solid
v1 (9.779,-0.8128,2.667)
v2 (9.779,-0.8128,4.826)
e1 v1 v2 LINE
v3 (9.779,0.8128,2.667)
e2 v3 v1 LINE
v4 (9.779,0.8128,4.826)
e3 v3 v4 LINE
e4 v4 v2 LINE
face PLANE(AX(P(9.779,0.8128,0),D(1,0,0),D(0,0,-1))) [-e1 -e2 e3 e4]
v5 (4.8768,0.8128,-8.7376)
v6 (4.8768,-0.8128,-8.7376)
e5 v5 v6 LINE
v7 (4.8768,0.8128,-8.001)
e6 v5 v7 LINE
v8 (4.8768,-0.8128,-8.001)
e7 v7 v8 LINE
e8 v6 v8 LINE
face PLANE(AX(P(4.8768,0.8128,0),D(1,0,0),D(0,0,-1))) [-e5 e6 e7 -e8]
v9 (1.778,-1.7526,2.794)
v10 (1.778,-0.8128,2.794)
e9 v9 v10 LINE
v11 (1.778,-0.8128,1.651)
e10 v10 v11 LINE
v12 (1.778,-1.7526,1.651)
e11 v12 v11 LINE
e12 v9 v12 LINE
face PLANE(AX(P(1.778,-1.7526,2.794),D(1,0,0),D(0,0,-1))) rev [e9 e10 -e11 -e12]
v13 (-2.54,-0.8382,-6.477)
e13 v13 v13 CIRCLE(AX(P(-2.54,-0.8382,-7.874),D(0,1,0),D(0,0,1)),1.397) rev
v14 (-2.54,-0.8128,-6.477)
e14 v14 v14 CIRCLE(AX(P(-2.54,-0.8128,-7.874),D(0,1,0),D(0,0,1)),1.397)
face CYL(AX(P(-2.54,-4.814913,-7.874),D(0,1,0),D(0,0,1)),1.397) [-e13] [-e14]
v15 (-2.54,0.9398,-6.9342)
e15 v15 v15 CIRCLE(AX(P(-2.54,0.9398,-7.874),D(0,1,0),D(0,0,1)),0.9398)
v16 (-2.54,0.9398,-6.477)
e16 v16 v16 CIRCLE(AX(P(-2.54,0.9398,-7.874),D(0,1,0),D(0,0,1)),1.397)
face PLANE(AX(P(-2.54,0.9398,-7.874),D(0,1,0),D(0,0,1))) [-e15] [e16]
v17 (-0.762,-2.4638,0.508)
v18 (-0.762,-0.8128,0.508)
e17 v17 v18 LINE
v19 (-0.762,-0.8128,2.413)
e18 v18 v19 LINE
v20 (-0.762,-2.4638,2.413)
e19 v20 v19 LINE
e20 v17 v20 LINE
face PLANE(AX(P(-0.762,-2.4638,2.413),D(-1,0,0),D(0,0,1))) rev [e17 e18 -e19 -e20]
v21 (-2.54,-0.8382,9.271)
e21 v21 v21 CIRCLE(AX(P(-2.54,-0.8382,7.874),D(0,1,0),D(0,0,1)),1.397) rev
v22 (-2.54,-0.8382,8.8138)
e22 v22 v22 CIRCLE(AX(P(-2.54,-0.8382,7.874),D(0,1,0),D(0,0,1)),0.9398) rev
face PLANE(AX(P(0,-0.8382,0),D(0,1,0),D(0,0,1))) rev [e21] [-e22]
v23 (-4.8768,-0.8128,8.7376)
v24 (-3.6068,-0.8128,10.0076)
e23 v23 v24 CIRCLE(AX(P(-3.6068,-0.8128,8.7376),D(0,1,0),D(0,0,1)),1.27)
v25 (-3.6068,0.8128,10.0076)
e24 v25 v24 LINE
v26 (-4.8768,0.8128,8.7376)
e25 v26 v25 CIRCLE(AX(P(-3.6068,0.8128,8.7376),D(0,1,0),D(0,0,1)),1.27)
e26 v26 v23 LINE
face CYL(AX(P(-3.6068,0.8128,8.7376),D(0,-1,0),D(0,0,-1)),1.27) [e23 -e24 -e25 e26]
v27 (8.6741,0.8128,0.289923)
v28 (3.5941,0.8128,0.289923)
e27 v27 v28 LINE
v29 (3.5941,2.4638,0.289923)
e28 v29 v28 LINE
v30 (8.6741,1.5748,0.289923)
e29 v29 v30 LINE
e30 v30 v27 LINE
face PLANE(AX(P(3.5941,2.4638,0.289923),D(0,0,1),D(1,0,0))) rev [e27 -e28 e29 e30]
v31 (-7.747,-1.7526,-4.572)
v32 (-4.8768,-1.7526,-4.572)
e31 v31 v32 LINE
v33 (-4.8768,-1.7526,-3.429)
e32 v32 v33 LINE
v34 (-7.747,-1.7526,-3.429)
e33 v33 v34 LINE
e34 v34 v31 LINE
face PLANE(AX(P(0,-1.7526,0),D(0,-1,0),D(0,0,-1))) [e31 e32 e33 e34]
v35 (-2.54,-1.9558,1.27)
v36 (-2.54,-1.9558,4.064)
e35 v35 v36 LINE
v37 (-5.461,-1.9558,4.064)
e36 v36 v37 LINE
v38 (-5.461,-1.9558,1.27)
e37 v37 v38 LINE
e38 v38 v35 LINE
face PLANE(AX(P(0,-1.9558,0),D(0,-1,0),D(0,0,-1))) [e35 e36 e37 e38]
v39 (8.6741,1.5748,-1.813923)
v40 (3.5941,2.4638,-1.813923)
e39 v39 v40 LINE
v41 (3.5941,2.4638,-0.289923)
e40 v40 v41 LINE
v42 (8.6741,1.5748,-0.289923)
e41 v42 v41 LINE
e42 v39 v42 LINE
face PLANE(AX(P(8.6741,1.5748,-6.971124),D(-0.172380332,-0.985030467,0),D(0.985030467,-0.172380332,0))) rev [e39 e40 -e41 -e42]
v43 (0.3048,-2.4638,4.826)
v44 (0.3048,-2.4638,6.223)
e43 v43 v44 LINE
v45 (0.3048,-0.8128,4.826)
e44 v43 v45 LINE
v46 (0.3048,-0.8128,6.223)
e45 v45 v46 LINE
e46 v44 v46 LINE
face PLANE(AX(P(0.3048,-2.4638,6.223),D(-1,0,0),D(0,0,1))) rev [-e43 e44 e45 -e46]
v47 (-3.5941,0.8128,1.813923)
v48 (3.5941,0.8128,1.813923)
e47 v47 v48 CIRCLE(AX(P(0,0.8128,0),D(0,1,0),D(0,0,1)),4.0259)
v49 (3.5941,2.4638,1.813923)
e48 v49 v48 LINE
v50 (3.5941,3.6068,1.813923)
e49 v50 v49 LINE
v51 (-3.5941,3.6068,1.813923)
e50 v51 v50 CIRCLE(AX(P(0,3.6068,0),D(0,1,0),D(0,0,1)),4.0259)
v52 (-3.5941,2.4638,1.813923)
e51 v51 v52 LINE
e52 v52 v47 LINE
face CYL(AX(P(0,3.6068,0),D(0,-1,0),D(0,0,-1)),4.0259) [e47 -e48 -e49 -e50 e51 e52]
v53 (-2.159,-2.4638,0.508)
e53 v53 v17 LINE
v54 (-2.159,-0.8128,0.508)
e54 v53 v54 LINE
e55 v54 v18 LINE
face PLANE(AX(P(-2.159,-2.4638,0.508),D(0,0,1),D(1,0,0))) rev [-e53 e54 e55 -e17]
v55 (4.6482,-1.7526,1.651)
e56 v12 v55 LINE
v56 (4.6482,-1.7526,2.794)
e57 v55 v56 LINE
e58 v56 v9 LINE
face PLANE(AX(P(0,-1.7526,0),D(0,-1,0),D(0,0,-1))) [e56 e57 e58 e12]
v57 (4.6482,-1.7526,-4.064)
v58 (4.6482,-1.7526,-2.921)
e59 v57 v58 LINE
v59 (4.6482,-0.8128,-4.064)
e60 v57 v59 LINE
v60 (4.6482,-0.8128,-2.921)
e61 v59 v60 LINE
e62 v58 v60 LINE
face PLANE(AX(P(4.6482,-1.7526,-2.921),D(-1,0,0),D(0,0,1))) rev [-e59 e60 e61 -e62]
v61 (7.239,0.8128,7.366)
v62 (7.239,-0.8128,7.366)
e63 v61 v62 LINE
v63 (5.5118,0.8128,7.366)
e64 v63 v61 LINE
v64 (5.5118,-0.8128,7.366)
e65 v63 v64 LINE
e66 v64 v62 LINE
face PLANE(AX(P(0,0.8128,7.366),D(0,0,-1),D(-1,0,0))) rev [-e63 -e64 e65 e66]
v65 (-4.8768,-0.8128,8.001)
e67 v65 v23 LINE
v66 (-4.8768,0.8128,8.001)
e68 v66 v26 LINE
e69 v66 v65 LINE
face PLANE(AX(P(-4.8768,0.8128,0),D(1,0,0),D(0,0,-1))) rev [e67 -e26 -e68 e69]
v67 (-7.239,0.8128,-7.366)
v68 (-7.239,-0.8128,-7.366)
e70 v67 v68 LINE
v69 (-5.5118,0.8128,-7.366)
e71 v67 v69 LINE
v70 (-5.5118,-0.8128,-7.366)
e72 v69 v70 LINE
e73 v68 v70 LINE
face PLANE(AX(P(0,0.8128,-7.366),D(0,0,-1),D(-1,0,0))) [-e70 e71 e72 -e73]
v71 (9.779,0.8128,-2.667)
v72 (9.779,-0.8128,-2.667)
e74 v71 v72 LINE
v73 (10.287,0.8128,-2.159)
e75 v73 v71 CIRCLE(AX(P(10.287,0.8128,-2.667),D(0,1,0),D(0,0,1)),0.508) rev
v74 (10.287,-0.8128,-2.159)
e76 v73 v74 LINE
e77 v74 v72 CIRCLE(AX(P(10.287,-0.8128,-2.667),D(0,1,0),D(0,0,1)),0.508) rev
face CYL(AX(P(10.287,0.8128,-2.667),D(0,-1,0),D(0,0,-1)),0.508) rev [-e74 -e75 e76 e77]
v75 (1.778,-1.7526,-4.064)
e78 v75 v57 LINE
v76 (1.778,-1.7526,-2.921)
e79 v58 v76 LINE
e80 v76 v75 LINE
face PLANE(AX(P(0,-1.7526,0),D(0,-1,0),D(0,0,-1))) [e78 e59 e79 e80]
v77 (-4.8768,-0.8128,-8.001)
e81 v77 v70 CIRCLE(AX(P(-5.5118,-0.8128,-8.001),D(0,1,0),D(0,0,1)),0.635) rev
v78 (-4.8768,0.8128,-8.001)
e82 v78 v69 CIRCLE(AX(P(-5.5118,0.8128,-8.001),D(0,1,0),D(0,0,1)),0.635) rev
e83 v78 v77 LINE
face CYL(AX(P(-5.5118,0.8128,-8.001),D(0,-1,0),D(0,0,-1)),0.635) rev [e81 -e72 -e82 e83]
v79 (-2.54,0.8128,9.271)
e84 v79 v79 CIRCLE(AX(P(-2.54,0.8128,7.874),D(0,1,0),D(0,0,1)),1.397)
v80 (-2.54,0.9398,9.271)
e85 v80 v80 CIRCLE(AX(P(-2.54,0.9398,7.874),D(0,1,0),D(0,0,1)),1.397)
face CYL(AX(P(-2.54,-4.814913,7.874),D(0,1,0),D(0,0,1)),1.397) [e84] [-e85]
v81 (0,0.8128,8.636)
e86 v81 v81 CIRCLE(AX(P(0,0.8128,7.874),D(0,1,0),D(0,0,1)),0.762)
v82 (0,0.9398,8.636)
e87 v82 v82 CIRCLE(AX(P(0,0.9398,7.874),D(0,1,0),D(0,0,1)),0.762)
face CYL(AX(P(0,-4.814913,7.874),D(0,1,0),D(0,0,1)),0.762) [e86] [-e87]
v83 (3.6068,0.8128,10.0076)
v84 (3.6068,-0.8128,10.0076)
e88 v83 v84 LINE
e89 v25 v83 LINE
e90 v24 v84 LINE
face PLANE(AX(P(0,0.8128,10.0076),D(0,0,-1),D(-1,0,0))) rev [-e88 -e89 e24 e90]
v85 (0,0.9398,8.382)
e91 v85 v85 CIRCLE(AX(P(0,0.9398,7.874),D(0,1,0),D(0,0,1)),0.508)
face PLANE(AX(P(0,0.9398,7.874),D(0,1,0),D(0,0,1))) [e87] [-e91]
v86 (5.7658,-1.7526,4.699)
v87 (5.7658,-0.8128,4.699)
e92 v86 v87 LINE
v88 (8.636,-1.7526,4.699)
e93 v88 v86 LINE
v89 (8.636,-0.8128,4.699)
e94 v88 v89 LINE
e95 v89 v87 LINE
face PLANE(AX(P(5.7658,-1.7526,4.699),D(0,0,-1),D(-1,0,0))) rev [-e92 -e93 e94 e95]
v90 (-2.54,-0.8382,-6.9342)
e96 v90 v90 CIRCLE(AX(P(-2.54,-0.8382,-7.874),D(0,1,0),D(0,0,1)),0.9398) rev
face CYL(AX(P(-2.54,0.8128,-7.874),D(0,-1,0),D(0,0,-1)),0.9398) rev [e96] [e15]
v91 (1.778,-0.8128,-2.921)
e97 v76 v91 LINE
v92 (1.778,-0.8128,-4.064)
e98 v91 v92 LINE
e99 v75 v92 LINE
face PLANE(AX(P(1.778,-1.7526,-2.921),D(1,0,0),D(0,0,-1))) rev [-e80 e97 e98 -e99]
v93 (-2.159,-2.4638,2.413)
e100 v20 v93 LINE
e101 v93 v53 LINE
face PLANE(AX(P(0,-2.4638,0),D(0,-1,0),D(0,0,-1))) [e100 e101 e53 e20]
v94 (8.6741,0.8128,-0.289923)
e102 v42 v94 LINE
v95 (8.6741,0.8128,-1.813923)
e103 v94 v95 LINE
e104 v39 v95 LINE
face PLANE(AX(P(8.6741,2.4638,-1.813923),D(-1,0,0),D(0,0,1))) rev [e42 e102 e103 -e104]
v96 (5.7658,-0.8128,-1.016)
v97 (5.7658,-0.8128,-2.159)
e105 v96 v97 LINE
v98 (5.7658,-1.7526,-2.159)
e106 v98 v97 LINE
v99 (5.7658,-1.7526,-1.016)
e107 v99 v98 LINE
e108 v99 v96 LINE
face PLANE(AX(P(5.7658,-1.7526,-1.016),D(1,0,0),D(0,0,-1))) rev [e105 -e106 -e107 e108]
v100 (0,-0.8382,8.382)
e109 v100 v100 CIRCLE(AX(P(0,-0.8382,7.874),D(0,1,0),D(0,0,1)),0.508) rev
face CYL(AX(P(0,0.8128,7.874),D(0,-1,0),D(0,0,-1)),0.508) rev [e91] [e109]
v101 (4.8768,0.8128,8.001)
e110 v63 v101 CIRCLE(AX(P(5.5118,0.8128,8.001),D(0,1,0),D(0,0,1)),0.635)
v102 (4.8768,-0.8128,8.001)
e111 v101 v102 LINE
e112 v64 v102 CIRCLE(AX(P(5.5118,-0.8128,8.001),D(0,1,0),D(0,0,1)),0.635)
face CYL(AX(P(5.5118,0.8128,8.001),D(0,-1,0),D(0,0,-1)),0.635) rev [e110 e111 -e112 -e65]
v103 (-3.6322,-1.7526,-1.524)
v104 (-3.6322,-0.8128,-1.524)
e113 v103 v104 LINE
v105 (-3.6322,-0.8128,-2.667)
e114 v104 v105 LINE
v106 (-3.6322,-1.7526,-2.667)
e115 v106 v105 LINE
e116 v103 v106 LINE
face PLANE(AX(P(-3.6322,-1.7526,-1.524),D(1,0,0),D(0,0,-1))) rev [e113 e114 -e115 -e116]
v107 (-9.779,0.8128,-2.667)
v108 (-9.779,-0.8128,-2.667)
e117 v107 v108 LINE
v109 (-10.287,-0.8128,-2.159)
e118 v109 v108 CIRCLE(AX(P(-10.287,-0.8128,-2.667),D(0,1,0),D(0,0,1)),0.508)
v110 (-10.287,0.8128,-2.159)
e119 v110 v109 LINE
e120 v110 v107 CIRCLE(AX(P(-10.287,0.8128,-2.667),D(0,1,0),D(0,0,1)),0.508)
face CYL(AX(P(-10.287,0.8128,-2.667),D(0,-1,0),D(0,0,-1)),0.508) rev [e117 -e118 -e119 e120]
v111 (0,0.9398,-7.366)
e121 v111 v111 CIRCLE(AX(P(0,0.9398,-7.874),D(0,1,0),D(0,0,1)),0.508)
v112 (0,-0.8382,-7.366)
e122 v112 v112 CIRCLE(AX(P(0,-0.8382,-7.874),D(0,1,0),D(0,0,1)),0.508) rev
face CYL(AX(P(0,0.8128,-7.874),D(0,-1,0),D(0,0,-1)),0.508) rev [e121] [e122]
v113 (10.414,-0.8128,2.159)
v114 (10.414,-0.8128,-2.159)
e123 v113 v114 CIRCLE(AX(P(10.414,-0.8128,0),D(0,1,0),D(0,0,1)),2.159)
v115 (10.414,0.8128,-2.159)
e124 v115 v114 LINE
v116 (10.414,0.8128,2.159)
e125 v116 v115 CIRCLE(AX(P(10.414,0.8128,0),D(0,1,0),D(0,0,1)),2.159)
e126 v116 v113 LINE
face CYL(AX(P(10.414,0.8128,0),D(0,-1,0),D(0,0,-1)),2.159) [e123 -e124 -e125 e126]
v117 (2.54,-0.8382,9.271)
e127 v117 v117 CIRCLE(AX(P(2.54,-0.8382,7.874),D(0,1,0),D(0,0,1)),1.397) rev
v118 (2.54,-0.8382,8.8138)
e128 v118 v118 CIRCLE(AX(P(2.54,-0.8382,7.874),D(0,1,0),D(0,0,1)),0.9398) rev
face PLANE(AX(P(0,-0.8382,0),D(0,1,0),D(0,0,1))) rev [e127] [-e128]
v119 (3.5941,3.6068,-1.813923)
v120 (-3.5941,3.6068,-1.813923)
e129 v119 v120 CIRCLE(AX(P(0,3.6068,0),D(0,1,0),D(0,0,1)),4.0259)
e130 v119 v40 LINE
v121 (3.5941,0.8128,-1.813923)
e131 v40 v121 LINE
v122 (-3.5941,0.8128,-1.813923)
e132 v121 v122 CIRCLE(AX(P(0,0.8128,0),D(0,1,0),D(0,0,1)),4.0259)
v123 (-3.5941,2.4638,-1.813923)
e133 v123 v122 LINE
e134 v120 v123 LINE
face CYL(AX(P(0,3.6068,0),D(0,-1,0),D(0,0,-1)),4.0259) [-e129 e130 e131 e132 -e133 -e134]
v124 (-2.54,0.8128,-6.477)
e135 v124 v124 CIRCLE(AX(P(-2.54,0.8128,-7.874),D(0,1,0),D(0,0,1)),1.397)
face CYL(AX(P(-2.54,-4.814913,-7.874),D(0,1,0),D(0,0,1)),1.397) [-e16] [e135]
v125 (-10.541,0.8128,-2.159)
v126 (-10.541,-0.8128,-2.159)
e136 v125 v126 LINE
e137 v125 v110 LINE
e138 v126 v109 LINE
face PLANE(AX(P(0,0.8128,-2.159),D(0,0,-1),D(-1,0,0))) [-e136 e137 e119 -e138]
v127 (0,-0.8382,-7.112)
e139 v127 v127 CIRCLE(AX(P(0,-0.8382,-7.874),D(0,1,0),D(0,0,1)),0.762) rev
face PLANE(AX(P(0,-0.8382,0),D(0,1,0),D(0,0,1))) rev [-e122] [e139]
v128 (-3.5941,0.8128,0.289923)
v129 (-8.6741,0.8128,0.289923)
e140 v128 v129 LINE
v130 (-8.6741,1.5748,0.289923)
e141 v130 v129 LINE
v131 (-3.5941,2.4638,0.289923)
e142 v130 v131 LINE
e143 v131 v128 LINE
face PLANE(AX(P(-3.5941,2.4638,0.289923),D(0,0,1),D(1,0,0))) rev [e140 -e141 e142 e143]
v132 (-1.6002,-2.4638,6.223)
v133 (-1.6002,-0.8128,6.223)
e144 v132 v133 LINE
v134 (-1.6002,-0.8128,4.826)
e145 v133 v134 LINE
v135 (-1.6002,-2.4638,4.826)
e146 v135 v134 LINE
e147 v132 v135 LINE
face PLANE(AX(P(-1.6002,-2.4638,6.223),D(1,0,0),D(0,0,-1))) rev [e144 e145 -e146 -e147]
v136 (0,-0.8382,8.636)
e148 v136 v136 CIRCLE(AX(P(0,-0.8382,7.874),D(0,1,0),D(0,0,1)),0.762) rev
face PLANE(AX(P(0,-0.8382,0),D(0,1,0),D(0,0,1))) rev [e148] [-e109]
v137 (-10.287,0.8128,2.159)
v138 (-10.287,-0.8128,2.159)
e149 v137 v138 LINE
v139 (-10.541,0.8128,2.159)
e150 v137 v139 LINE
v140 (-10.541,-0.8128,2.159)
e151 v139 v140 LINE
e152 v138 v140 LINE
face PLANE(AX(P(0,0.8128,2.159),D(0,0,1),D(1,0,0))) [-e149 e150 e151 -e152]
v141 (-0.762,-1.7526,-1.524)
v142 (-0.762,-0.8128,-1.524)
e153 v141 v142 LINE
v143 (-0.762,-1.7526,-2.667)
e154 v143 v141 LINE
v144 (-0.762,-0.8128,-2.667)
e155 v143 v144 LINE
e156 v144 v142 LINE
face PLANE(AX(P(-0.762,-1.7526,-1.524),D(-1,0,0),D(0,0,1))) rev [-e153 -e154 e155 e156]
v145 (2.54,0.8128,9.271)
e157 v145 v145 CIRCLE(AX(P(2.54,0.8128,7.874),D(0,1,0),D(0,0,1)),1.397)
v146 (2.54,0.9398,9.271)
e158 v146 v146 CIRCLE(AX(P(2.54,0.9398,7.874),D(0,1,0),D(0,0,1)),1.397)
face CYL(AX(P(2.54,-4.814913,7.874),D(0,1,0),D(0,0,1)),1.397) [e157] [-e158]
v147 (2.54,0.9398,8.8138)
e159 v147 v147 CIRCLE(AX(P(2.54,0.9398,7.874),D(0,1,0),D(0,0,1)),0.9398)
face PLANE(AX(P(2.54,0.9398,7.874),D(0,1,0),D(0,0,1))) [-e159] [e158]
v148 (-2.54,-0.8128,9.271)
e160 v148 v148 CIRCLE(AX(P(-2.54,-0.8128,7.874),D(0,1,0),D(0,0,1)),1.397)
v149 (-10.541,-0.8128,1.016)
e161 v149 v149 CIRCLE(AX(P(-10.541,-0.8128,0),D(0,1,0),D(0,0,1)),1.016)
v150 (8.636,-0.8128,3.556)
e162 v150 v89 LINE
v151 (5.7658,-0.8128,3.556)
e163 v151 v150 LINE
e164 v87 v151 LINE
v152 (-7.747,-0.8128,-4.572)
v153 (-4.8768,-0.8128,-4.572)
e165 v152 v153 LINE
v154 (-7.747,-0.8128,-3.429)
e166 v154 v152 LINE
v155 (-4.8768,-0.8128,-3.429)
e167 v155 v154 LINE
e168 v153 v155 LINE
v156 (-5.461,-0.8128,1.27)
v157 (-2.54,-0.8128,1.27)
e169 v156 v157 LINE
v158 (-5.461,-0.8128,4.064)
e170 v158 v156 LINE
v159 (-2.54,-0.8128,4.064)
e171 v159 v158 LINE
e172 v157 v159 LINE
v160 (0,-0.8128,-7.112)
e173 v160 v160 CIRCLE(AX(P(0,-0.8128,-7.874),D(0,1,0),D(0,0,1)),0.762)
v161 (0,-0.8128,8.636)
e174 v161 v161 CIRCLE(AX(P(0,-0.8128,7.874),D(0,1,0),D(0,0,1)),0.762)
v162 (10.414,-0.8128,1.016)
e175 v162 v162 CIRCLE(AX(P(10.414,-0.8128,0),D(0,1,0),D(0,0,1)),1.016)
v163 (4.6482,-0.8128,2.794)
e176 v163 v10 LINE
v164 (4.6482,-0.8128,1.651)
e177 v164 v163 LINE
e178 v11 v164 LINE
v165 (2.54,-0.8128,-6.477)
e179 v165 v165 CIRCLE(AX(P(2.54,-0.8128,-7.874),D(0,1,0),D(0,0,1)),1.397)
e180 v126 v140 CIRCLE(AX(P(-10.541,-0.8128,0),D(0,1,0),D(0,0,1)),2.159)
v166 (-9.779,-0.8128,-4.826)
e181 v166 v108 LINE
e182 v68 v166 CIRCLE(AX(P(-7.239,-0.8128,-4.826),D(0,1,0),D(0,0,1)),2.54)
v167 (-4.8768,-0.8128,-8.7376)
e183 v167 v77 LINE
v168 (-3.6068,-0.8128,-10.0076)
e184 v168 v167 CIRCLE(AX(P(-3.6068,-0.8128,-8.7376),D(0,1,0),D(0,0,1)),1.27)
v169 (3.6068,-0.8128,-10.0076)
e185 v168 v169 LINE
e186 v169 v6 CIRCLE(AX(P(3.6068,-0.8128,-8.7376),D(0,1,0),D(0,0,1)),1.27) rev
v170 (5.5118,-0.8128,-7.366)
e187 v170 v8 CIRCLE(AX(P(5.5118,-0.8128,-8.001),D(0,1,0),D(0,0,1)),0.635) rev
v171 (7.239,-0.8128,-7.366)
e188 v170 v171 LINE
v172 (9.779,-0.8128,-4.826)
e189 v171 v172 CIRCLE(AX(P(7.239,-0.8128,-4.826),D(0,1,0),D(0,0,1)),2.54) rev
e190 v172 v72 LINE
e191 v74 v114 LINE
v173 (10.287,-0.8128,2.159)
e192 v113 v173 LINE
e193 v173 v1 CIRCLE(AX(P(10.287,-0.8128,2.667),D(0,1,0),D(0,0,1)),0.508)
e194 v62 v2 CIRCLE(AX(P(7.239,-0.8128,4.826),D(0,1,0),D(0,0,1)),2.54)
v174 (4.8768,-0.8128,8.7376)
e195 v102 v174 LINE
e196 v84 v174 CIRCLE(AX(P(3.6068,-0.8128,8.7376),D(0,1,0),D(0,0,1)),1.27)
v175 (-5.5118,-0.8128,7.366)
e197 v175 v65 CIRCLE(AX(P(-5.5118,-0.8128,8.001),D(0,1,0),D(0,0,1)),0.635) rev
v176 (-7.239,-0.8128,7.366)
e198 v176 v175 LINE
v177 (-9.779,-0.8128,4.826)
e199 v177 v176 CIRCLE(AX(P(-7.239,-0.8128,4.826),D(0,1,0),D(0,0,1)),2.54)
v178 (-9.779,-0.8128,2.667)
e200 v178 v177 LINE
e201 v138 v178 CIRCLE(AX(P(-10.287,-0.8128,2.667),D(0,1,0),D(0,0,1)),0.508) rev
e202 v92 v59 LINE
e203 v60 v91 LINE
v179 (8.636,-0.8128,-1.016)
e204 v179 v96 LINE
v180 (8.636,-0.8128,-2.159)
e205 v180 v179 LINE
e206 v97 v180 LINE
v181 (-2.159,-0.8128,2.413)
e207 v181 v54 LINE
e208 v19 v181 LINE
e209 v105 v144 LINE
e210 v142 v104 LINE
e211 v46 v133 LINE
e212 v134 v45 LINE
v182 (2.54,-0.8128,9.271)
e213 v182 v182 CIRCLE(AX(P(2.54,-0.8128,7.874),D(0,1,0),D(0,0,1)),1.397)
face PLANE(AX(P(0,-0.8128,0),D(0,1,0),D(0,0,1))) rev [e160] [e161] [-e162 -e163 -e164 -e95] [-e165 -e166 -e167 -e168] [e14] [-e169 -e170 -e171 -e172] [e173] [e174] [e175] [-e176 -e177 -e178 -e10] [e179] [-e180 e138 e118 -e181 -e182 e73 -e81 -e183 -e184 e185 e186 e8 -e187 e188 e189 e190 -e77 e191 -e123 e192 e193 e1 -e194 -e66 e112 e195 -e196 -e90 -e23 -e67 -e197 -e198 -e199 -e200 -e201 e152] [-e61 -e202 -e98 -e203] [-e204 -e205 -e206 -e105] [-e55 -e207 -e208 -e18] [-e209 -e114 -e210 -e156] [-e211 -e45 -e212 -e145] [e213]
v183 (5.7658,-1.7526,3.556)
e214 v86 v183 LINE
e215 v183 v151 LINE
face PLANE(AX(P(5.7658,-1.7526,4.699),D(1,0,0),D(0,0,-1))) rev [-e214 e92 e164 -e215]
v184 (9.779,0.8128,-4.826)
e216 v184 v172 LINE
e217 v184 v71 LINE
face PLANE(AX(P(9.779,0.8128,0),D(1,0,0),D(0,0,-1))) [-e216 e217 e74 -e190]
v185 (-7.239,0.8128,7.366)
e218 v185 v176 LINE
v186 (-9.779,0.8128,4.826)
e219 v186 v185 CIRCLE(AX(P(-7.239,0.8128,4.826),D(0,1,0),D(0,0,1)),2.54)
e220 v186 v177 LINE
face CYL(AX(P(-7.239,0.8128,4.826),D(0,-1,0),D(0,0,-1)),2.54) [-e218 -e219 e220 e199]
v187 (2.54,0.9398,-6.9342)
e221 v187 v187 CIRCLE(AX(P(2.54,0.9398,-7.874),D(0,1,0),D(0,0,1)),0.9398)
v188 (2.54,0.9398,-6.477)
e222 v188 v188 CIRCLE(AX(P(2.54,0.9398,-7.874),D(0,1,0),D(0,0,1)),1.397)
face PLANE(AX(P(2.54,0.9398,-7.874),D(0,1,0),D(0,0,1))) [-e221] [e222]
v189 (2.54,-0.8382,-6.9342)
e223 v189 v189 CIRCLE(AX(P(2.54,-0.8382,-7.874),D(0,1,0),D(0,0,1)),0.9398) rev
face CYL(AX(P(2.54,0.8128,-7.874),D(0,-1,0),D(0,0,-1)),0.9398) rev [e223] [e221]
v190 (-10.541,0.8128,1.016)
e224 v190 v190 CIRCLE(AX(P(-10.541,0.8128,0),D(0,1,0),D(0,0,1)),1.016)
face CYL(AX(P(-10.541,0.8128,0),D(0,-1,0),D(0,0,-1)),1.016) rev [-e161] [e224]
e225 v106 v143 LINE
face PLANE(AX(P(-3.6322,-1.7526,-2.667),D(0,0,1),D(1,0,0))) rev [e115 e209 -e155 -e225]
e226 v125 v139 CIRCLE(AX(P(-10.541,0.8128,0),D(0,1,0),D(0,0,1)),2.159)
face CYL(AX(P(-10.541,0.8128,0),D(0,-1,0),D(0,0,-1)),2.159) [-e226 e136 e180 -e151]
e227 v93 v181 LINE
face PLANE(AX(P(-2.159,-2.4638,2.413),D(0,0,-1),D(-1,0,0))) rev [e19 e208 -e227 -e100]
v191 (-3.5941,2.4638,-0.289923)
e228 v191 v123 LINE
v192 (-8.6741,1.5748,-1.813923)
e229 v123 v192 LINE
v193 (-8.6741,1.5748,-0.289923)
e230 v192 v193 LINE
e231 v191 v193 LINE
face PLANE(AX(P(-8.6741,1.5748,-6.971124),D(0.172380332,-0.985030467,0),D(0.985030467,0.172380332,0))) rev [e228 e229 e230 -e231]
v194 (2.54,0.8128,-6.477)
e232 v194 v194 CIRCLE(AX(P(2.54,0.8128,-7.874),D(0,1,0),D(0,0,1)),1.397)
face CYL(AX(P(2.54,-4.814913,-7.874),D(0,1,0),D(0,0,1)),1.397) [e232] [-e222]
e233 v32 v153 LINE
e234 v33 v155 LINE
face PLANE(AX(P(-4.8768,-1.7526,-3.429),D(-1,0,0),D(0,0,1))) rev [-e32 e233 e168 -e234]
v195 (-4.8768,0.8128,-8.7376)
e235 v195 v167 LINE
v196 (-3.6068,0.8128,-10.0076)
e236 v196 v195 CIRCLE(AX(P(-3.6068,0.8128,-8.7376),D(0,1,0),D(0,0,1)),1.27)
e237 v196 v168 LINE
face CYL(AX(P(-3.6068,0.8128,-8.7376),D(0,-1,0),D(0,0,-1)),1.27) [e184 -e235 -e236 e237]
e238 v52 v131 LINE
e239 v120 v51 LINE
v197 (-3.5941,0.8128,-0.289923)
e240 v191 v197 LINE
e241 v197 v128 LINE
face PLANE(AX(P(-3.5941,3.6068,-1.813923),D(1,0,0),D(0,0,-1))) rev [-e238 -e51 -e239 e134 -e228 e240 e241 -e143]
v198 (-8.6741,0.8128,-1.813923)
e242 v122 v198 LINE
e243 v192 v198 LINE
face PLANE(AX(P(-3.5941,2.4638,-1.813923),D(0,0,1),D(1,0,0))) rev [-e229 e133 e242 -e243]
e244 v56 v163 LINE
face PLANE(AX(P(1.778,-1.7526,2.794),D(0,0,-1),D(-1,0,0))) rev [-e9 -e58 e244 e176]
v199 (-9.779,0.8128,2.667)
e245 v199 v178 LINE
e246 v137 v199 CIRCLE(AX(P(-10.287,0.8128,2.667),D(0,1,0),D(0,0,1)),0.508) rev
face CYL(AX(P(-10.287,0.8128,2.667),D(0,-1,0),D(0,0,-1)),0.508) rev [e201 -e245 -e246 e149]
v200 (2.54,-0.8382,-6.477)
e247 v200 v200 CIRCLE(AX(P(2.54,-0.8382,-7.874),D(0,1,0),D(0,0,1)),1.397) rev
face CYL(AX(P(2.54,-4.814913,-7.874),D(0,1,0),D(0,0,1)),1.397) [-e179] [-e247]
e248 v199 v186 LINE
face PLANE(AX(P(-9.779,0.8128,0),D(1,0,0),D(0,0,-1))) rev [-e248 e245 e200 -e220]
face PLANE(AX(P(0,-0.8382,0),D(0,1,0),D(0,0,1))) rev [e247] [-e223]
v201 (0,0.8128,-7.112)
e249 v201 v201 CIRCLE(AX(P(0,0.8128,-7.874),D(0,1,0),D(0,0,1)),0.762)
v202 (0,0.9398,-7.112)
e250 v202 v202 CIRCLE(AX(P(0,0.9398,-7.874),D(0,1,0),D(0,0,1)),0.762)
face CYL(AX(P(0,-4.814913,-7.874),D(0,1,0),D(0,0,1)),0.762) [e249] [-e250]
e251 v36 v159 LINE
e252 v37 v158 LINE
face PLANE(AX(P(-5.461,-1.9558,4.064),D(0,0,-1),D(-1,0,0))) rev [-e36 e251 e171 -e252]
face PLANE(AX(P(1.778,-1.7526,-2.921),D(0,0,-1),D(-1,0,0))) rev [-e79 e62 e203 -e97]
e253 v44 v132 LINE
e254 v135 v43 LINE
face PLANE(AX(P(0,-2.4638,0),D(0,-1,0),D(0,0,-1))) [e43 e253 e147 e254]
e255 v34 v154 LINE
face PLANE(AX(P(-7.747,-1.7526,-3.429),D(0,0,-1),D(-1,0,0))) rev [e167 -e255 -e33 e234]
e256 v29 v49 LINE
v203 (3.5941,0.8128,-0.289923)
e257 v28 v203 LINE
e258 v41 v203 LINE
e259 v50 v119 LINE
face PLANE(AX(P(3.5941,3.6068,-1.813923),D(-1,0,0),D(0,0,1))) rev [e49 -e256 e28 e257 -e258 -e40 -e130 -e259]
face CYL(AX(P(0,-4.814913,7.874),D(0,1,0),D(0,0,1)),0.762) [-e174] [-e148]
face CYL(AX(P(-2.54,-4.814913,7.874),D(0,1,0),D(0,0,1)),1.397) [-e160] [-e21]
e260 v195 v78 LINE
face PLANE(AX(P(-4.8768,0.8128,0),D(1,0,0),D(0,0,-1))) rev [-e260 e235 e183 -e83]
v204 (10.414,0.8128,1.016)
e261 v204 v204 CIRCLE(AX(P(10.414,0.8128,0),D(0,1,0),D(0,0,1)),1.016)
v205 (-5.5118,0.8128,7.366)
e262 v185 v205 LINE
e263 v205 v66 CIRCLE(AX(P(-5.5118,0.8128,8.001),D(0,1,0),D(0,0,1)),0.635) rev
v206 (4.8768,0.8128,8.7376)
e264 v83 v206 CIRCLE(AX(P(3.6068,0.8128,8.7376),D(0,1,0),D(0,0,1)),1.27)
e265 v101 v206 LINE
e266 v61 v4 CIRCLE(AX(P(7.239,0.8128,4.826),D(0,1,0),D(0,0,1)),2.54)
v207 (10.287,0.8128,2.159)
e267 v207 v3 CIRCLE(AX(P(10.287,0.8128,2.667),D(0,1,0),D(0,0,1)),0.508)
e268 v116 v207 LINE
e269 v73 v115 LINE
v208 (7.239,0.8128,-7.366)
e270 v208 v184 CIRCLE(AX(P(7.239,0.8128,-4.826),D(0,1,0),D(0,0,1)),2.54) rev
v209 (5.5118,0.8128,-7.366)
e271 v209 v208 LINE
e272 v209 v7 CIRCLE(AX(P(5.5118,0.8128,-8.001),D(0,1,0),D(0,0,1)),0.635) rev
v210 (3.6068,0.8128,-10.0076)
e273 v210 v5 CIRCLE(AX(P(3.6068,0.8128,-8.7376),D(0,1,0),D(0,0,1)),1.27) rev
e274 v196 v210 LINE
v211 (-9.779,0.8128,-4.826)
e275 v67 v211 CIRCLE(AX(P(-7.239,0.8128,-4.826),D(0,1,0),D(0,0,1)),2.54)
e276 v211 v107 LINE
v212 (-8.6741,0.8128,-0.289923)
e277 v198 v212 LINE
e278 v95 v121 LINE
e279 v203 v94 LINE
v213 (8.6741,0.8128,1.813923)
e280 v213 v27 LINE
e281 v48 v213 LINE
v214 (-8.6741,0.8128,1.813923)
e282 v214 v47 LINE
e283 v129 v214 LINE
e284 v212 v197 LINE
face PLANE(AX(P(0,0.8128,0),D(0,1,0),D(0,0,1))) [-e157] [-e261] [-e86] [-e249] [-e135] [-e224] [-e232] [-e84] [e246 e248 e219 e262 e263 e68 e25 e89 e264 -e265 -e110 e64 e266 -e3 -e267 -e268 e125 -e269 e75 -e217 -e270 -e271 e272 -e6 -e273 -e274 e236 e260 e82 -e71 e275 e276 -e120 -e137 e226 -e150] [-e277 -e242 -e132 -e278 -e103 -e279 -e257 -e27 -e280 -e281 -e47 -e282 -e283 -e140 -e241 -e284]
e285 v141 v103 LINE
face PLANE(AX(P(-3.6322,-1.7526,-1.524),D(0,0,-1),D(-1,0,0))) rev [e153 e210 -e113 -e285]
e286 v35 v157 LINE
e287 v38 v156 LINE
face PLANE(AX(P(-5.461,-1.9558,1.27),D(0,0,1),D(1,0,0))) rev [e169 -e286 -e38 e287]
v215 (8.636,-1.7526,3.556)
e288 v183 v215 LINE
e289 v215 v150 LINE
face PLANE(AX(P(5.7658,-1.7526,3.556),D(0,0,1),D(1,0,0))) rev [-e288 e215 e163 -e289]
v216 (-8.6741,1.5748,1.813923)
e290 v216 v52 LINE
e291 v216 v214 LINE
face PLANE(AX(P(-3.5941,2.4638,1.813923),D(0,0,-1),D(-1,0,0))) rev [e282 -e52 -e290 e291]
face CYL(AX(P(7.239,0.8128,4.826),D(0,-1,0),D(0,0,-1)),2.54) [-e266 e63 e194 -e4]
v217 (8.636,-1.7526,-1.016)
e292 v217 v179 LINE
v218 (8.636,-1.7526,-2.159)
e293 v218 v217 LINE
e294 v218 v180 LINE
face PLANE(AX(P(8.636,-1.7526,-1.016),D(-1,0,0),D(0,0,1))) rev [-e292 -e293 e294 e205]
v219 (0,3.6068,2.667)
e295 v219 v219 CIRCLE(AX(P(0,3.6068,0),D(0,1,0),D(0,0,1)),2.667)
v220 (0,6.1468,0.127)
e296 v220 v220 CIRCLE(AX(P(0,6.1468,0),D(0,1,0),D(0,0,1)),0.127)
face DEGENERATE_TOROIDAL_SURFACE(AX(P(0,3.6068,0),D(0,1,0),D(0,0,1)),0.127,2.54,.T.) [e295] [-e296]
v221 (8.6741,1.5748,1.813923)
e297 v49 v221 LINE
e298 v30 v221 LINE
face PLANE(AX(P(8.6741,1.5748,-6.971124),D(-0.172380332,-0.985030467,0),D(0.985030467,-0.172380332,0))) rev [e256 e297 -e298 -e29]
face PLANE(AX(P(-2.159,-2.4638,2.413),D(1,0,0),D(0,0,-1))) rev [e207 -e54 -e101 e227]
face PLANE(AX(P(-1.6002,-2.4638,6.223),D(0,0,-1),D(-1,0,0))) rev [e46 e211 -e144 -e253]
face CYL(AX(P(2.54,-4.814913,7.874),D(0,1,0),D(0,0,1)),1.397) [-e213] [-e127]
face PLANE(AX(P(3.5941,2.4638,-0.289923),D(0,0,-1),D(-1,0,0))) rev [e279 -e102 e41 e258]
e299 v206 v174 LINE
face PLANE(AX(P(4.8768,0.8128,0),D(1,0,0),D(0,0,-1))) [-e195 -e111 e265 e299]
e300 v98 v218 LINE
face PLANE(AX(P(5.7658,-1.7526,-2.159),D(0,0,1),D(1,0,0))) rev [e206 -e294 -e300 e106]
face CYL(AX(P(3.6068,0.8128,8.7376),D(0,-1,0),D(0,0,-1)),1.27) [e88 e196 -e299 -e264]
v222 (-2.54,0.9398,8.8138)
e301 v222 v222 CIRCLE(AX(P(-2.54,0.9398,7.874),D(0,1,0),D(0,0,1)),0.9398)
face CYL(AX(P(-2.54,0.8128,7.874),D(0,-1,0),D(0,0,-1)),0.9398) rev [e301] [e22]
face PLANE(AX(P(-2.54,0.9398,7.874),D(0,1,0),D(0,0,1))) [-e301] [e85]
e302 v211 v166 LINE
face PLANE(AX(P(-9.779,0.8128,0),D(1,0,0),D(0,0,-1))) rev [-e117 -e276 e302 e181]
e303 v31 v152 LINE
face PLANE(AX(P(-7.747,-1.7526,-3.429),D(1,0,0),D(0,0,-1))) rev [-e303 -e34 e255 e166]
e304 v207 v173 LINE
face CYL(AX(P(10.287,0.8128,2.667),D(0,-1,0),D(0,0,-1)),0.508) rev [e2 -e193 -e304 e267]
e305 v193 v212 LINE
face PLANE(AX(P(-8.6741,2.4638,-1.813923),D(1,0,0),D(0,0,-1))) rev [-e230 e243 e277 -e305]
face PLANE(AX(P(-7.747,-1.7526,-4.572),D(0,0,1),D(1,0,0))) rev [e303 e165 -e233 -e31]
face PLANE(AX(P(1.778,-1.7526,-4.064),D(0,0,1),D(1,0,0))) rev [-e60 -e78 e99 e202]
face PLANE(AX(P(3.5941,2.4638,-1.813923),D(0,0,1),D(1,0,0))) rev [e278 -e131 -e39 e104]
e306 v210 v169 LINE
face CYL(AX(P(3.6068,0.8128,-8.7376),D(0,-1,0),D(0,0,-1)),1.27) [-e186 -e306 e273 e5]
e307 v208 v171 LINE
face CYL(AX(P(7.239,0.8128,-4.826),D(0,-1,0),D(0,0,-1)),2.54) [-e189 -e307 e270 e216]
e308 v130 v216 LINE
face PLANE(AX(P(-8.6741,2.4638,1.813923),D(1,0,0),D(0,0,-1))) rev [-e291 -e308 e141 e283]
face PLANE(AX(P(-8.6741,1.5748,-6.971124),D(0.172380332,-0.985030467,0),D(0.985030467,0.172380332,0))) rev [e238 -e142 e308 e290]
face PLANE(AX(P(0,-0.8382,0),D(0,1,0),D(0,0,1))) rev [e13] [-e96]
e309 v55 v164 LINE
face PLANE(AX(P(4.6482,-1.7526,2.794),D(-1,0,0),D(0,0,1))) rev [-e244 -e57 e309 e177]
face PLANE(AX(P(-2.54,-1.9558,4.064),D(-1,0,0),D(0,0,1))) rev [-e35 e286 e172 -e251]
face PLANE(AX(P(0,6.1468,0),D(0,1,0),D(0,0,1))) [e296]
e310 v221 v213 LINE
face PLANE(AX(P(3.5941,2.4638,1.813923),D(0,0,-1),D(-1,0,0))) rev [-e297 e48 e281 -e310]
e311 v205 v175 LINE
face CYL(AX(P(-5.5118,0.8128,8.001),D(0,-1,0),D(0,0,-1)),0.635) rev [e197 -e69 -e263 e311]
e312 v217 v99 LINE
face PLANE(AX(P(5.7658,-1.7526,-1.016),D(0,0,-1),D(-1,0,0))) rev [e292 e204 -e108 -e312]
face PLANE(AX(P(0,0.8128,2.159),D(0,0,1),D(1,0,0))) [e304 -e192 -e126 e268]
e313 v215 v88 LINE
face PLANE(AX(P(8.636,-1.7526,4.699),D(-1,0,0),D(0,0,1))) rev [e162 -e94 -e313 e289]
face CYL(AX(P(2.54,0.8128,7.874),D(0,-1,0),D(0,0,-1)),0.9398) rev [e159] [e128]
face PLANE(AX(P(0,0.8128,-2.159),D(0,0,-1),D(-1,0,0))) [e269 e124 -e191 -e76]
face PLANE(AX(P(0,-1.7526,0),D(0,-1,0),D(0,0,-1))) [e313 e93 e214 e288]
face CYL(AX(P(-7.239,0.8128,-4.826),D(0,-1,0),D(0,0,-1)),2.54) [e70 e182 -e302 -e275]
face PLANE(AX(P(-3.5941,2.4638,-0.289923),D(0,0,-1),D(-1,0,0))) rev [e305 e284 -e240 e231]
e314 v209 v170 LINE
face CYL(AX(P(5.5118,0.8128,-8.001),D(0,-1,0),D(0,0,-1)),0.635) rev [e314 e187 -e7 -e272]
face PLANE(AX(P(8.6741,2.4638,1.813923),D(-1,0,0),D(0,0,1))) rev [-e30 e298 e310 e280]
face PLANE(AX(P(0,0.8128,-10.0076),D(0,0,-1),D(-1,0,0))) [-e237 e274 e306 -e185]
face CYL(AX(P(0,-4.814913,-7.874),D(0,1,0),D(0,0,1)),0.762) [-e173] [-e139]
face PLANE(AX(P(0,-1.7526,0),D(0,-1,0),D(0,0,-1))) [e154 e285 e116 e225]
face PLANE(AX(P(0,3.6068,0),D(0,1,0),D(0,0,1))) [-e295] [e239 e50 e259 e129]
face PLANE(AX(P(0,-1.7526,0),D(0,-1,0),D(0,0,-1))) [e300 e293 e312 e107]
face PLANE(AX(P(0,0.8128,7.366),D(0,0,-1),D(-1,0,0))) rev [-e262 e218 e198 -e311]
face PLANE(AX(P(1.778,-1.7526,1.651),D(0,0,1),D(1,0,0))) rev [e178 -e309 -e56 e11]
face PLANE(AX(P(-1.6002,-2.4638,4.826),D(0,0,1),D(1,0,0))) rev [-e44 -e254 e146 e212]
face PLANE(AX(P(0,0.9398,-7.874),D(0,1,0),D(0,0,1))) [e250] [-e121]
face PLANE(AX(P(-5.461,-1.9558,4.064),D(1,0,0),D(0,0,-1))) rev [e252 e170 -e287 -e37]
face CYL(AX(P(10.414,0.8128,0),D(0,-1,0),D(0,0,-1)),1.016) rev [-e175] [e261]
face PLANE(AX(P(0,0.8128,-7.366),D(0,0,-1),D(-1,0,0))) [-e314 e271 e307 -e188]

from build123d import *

# Parameters (mm, degrees)
SKETCH1_R           = 1.016
SKETCH1_R_2         = 0.508
SKETCH1_R_3         = 0.9398
BOSS_EXTRUDE1_DEPTH = 0.8128
BOSS_EXTRUDE2_DEPTH = 2.794
SKETCH3_R           = 2.667
BOSS_EXTRUDE3_DEPTH = 2.54
FILLET1_R           = 2.54
BOSS_EXTRUDE4_START = -1.651
SKETCH4_R           = 1.397
SKETCH4_R_2         = 0.9398
SKETCH4_R_3         = 0.762
SKETCH4_R_4         = 0.508
BOSS_EXTRUDE4_DEPTH = 1.778
SKETCH5_W           = 5.08
SKETCH5_H           = 1.524
BOSS_EXTRUDE5_DEPTH = 1.651
CUT_EXTRUDE1_REACH  = 20.407
SKETCH7_W           = 2.8702
SKETCH7_H           = 1.143
BOSS_EXTRUDE6_DEPTH = 0.9398
SKETCH8_W           = 2.921
SKETCH8_H           = 2.794
BOSS_EXTRUDE7_DEPTH = 1.143
SKETCH9_W           = 1.397
SKETCH9_H           = 1.905
SKETCH9_W_2         = 1.905
SKETCH9_H_2         = 1.397
BOSS_EXTRUDE8_DEPTH = 1.651


with BuildPart() as part:
    # Sketch1 → Boss-Extrude1 (new, symmetric)
    with BuildSketch(Plane(origin=(0, 0, 0), x_dir=(1, 0, 0), z_dir=(0, 1, 0))):
        with BuildLine():
            Line((-10.541, 2.159), (-10.287, 2.159))
            ThreePointArc((-10.287, 2.159), (-9.927789755, 2.307789755), (-9.779, 2.667))
            Line((-9.779, 2.667), (-9.779, 4.826))
            ThreePointArc((-9.779, 4.826), (-9.035051224, 6.622051224), (-7.239, 7.366))
            Line((-7.239, 7.366), (-5.5118, 7.366))
            ThreePointArc((-5.5118, 7.366), (-5.062787194, 7.551987194), (-4.8768, 8.001))
            Line((-4.8768, 8.001), (-4.8768, 8.7376))
            ThreePointArc((-4.8768, 8.7376), (-4.504825612, 9.635625612), (-3.6068, 10.0076))
            Line((-3.6068, 10.0076), (3.6068, 10.0076))
            ThreePointArc((3.6068, 10.0076), (4.504825612, 9.635625612), (4.8768, 8.7376))
            Line((4.8768, 8.7376), (4.8768, 8.001))
            ThreePointArc((4.8768, 8.001), (5.062787194, 7.551987194), (5.5118, 7.366))
            Line((5.5118, 7.366), (7.239, 7.366))
            ThreePointArc((7.239, 7.366), (9.035051224, 6.622051224), (9.779, 4.826))
            Line((9.779, 4.826), (9.779, 2.667))
            ThreePointArc((9.779, 2.667), (9.927789755, 2.307789755), (10.287, 2.159))
            Line((10.287, 2.159), (10.414, 2.159))
            ThreePointArc((10.414, 2.159), (12.573, 0), (10.414, -2.159))
            Line((10.414, -2.159), (10.287, -2.159))
            ThreePointArc((10.287, -2.159), (9.927789755, -2.307789755), (9.779, -2.667))
            Line((9.779, -2.667), (9.779, -4.826))
            ThreePointArc((9.779, -4.826), (9.035051224, -6.622051224), (7.239, -7.366))
            Line((7.239, -7.366), (5.5118, -7.366))
            ThreePointArc((5.5118, -7.366), (5.062787194, -7.551987194), (4.8768, -8.001))
            Line((4.8768, -8.001), (4.8768, -8.7376))
            ThreePointArc((4.8768, -8.7376), (4.504825612, -9.635625612), (3.6068, -10.0076))
            Line((3.6068, -10.0076), (-3.6068, -10.0076))
            ThreePointArc((-3.6068, -10.0076), (-4.504825612, -9.635625612), (-4.8768, -8.7376))
            Line((-4.8768, -8.7376), (-4.8768, -8.001))
            ThreePointArc((-4.8768, -8.001), (-5.062787194, -7.551987194), (-5.5118, -7.366))
            Line((-5.5118, -7.366), (-7.239, -7.366))
            ThreePointArc((-7.239, -7.366), (-9.035051224, -6.622051224), (-9.779, -4.826))
            Line((-9.779, -4.826), (-9.779, -2.667))
            ThreePointArc((-9.779, -2.667), (-9.927789755, -2.307789755), (-10.287, -2.159))
            Line((-10.287, -2.159), (-10.541, -2.159))
            ThreePointArc((-10.541, -2.159), (-12.7, 0), (-10.541, 2.159))
        make_face()
        with Locations(Location((-10.541, 0, 0), (0, 0, 270))):
            Circle(SKETCH1_R, mode=Mode.SUBTRACT)
        with Locations(Location((10.414, 0, 0), (0, 0, 270))):
            Circle(SKETCH1_R, mode=Mode.SUBTRACT)
        with Locations(Location((0, 7.874, 0), (0, 0, 270))):
            Circle(SKETCH1_R_2, mode=Mode.SUBTRACT)
        with Locations(Location((0, -7.874, 0), (0, 0, 270))):
            Circle(SKETCH1_R_2, mode=Mode.SUBTRACT)
        with Locations(Location((-2.54, 7.874, 0), (0, 0, 270))):
            Circle(SKETCH1_R_3, mode=Mode.SUBTRACT)
        with Locations(Location((2.54, 7.874, 0), (0, 0, 270))):
            Circle(SKETCH1_R_3, mode=Mode.SUBTRACT)
        with Locations(Location((-2.54, -7.874, 0), (0, 0, 270))):
            Circle(SKETCH1_R_3, mode=Mode.SUBTRACT)
        with Locations(Location((2.54, -7.874, 0), (0, 0, 270))):
            Circle(SKETCH1_R_3, mode=Mode.SUBTRACT)
    extrude(amount=BOSS_EXTRUDE1_DEPTH, both=True)

    # Sketch2 → Boss-Extrude2 (add)
    with BuildSketch(Plane(origin=(0, 0.8128, 0), x_dir=(1, 0, 0), z_dir=(0, 1, 0))):
        with BuildLine():
            Line((-3.5941, 1.813922821), (-3.5941, -1.813922821))
            ThreePointArc((-3.5941, -1.813922821), (0, -4.0259), (3.5941, -1.813922821))
            Line((3.5941, -1.813922821), (3.5941, 1.813922821))
            ThreePointArc((3.5941, 1.813922821), (0, 4.0259), (-3.5941, 1.813922821))
        make_face()
    extrude(amount=BOSS_EXTRUDE2_DEPTH)

    # Sketch3 → Boss-Extrude3 (add)
    with BuildSketch(Plane(origin=(0, 3.6068, 0), x_dir=(1, 0, 0), z_dir=(0, 1, 0))):
        with Locations(Location((0, 0, 0), (0, 0, 270))):
            Circle(SKETCH3_R)
    extrude(amount=BOSS_EXTRUDE3_DEPTH)

    # Fillet1
    fillet1_edges = [part.edges().sort_by_distance(p)[0] for p in [
        (0, 6.1468, -2.667),
    ]]
    fillet(fillet1_edges, radius=FILLET1_R - 0.0001)  # a hair under: the kernel refuses the full size

    # Sketch4 → Boss-Extrude4 (add)
    # profile 1 of 6: a face of its own
    with BuildSketch(Plane(origin=(0, 0.8128, 0), x_dir=(1, 0, 0), z_dir=(0, 1, 0)).offset(BOSS_EXTRUDE4_START)):
        with Locations(Location((2.54, -7.874, 0), (0, 0, 270))):
            Circle(SKETCH4_R)
        with Locations(Location((2.54, -7.874, 0), (0, 0, 270))):
            Circle(SKETCH4_R_2, mode=Mode.SUBTRACT)
    # profile 2 of 6: a face of its own
    with BuildSketch(Plane(origin=(0, 0.8128, 0), x_dir=(1, 0, 0), z_dir=(0, 1, 0)).offset(BOSS_EXTRUDE4_START)):
        with Locations(Location((0, -7.874, 0), (0, 0, 270))):
            Circle(SKETCH4_R_3)
        with Locations(Location((0, -7.874, 0), (0, 0, 270))):
            Circle(SKETCH4_R_4, mode=Mode.SUBTRACT)
    # profile 3 of 6: a face of its own
    with BuildSketch(Plane(origin=(0, 0.8128, 0), x_dir=(1, 0, 0), z_dir=(0, 1, 0)).offset(BOSS_EXTRUDE4_START)):
        with Locations(Location((-2.54, -7.874, 0), (0, 0, 270))):
            Circle(SKETCH4_R)
        with Locations(Location((-2.54, -7.874, 0), (0, 0, 270))):
            Circle(SKETCH4_R_2, mode=Mode.SUBTRACT)
    # profile 4 of 6: a face of its own
    with BuildSketch(Plane(origin=(0, 0.8128, 0), x_dir=(1, 0, 0), z_dir=(0, 1, 0)).offset(BOSS_EXTRUDE4_START)):
        with Locations(Location((-2.54, 7.874, 0), (0, 0, 270))):
            Circle(SKETCH4_R)
        with Locations(Location((-2.54, 7.874, 0), (0, 0, 270))):
            Circle(SKETCH4_R_2, mode=Mode.SUBTRACT)
    # profile 5 of 6: a face of its own
    with BuildSketch(Plane(origin=(0, 0.8128, 0), x_dir=(1, 0, 0), z_dir=(0, 1, 0)).offset(BOSS_EXTRUDE4_START)):
        with Locations(Location((0, 7.874, 0), (0, 0, 270))):
            Circle(SKETCH4_R_3)
        with Locations(Location((0, 7.874, 0), (0, 0, 270))):
            Circle(SKETCH4_R_4, mode=Mode.SUBTRACT)
    # profile 6 of 6: a face of its own
    with BuildSketch(Plane(origin=(0, 0.8128, 0), x_dir=(1, 0, 0), z_dir=(0, 1, 0)).offset(BOSS_EXTRUDE4_START)):
        with Locations(Location((2.54, 7.874, 0), (0, 0, 270))):
            Circle(SKETCH4_R)
        with Locations(Location((2.54, 7.874, 0), (0, 0, 270))):
            Circle(SKETCH4_R_2, mode=Mode.SUBTRACT)
    extrude(amount=BOSS_EXTRUDE4_DEPTH)

    # Sketch5 → Boss-Extrude5 (add)
    with BuildSketch(Plane(origin=(0, 0.8128, 0), x_dir=(1, 0, 0), z_dir=(0, 1, 0))):
        with Locations((6.1341, -1.051922821)):
            Rectangle(SKETCH5_W, SKETCH5_H)
        with Locations((6.1341, 1.051922821)):
            Rectangle(SKETCH5_W, SKETCH5_H)
        with Locations((-6.1341, 1.051922821)):
            Rectangle(SKETCH5_W, SKETCH5_H)
        with Locations((-6.1341, -1.051922821)):
            Rectangle(SKETCH5_W, SKETCH5_H)
    extrude(amount=BOSS_EXTRUDE5_DEPTH)

    # Cut-Extrude1: up to this face of the body (flat: up to its plane)
    cut_extrude1_end = Plane(part.part.faces().sort_by_distance((-6.1341, 1.6383, -1.813922821))[0])
    # Sketch6 → Cut-Extrude1 (cut, up to the picked face)
    with BuildSketch(Plane.XY.offset(1.813922821), mode=Mode.PRIVATE) as cut_extrude1_sk1:
        Polygon((-8.6741, 1.5748), (-3.5941, 2.4638), (-8.6741, 2.4638), align=None)
    cut_extrude1_tool1 = split(extrude(cut_extrude1_sk1.sketch, amount=-CUT_EXTRUDE1_REACH, mode=Mode.PRIVATE), bisect_by=cut_extrude1_end, keep=Keep.BOTH, mode=Mode.PRIVATE)
    # Sketch6 → Cut-Extrude1 (cut, up to the picked face)
    with BuildSketch(Plane.XY.offset(1.813922821), mode=Mode.PRIVATE) as cut_extrude1_sk2:
        Polygon((8.6741, 2.4638), (8.6741, 1.5748), (3.5941, 2.4638), align=None)
    cut_extrude1_tool2 = split(extrude(cut_extrude1_sk2.sketch, amount=-CUT_EXTRUDE1_REACH, mode=Mode.PRIVATE), bisect_by=cut_extrude1_end, keep=Keep.BOTH, mode=Mode.PRIVATE)
    add(cut_extrude1_tool1.solids().sort_by(Axis((-6.980767, 2.167467, 1.813923), (0, 0, -1)))[0], mode=Mode.SUBTRACT)
    add(cut_extrude1_tool2.solids().sort_by(Axis((6.980767, 2.167467, 1.813923), (0, 0, -1)))[0], mode=Mode.SUBTRACT)

    # Sketch7 → Boss-Extrude6 (add)
    with BuildSketch(Plane.XZ.offset(0.8128)):
        with Locations((7.2009, 4.1275)):
            Rectangle(SKETCH7_W, SKETCH7_H)
        with Locations((7.2009, -1.5875)):
            Rectangle(SKETCH7_W, SKETCH7_H)
        with Locations((3.2131, 2.2225)):
            Rectangle(SKETCH7_W, SKETCH7_H)
        with Locations((3.2131, -3.4925)):
            Rectangle(SKETCH7_W, SKETCH7_H)
        with Locations((-6.3119, -4.0005)):
            Rectangle(SKETCH7_W, SKETCH7_H)
        with Locations((-2.1971, -2.0955)):
            Rectangle(SKETCH7_W, SKETCH7_H)
    extrude(amount=BOSS_EXTRUDE6_DEPTH)

    # Sketch8 → Boss-Extrude7 (add)
    with BuildSketch(Plane(origin=(0, -0.8128, 0), x_dir=(-1, 0, 0), z_dir=(0, -1, 0))):
        with Locations((4.0005, -2.667)):
            Rectangle(SKETCH8_W, SKETCH8_H)
    extrude(amount=BOSS_EXTRUDE7_DEPTH)

    # Sketch9 → Boss-Extrude8 (add)
    with BuildSketch(Plane.XZ.offset(0.8128)):
        with Locations((-1.4605, 1.4605)):
            Rectangle(SKETCH9_W, SKETCH9_H)
        with Locations((-0.6477, 5.5245)):
            Rectangle(SKETCH9_W_2, SKETCH9_H_2)
    extrude(amount=BOSS_EXTRUDE8_DEPTH)


solid = part.part
